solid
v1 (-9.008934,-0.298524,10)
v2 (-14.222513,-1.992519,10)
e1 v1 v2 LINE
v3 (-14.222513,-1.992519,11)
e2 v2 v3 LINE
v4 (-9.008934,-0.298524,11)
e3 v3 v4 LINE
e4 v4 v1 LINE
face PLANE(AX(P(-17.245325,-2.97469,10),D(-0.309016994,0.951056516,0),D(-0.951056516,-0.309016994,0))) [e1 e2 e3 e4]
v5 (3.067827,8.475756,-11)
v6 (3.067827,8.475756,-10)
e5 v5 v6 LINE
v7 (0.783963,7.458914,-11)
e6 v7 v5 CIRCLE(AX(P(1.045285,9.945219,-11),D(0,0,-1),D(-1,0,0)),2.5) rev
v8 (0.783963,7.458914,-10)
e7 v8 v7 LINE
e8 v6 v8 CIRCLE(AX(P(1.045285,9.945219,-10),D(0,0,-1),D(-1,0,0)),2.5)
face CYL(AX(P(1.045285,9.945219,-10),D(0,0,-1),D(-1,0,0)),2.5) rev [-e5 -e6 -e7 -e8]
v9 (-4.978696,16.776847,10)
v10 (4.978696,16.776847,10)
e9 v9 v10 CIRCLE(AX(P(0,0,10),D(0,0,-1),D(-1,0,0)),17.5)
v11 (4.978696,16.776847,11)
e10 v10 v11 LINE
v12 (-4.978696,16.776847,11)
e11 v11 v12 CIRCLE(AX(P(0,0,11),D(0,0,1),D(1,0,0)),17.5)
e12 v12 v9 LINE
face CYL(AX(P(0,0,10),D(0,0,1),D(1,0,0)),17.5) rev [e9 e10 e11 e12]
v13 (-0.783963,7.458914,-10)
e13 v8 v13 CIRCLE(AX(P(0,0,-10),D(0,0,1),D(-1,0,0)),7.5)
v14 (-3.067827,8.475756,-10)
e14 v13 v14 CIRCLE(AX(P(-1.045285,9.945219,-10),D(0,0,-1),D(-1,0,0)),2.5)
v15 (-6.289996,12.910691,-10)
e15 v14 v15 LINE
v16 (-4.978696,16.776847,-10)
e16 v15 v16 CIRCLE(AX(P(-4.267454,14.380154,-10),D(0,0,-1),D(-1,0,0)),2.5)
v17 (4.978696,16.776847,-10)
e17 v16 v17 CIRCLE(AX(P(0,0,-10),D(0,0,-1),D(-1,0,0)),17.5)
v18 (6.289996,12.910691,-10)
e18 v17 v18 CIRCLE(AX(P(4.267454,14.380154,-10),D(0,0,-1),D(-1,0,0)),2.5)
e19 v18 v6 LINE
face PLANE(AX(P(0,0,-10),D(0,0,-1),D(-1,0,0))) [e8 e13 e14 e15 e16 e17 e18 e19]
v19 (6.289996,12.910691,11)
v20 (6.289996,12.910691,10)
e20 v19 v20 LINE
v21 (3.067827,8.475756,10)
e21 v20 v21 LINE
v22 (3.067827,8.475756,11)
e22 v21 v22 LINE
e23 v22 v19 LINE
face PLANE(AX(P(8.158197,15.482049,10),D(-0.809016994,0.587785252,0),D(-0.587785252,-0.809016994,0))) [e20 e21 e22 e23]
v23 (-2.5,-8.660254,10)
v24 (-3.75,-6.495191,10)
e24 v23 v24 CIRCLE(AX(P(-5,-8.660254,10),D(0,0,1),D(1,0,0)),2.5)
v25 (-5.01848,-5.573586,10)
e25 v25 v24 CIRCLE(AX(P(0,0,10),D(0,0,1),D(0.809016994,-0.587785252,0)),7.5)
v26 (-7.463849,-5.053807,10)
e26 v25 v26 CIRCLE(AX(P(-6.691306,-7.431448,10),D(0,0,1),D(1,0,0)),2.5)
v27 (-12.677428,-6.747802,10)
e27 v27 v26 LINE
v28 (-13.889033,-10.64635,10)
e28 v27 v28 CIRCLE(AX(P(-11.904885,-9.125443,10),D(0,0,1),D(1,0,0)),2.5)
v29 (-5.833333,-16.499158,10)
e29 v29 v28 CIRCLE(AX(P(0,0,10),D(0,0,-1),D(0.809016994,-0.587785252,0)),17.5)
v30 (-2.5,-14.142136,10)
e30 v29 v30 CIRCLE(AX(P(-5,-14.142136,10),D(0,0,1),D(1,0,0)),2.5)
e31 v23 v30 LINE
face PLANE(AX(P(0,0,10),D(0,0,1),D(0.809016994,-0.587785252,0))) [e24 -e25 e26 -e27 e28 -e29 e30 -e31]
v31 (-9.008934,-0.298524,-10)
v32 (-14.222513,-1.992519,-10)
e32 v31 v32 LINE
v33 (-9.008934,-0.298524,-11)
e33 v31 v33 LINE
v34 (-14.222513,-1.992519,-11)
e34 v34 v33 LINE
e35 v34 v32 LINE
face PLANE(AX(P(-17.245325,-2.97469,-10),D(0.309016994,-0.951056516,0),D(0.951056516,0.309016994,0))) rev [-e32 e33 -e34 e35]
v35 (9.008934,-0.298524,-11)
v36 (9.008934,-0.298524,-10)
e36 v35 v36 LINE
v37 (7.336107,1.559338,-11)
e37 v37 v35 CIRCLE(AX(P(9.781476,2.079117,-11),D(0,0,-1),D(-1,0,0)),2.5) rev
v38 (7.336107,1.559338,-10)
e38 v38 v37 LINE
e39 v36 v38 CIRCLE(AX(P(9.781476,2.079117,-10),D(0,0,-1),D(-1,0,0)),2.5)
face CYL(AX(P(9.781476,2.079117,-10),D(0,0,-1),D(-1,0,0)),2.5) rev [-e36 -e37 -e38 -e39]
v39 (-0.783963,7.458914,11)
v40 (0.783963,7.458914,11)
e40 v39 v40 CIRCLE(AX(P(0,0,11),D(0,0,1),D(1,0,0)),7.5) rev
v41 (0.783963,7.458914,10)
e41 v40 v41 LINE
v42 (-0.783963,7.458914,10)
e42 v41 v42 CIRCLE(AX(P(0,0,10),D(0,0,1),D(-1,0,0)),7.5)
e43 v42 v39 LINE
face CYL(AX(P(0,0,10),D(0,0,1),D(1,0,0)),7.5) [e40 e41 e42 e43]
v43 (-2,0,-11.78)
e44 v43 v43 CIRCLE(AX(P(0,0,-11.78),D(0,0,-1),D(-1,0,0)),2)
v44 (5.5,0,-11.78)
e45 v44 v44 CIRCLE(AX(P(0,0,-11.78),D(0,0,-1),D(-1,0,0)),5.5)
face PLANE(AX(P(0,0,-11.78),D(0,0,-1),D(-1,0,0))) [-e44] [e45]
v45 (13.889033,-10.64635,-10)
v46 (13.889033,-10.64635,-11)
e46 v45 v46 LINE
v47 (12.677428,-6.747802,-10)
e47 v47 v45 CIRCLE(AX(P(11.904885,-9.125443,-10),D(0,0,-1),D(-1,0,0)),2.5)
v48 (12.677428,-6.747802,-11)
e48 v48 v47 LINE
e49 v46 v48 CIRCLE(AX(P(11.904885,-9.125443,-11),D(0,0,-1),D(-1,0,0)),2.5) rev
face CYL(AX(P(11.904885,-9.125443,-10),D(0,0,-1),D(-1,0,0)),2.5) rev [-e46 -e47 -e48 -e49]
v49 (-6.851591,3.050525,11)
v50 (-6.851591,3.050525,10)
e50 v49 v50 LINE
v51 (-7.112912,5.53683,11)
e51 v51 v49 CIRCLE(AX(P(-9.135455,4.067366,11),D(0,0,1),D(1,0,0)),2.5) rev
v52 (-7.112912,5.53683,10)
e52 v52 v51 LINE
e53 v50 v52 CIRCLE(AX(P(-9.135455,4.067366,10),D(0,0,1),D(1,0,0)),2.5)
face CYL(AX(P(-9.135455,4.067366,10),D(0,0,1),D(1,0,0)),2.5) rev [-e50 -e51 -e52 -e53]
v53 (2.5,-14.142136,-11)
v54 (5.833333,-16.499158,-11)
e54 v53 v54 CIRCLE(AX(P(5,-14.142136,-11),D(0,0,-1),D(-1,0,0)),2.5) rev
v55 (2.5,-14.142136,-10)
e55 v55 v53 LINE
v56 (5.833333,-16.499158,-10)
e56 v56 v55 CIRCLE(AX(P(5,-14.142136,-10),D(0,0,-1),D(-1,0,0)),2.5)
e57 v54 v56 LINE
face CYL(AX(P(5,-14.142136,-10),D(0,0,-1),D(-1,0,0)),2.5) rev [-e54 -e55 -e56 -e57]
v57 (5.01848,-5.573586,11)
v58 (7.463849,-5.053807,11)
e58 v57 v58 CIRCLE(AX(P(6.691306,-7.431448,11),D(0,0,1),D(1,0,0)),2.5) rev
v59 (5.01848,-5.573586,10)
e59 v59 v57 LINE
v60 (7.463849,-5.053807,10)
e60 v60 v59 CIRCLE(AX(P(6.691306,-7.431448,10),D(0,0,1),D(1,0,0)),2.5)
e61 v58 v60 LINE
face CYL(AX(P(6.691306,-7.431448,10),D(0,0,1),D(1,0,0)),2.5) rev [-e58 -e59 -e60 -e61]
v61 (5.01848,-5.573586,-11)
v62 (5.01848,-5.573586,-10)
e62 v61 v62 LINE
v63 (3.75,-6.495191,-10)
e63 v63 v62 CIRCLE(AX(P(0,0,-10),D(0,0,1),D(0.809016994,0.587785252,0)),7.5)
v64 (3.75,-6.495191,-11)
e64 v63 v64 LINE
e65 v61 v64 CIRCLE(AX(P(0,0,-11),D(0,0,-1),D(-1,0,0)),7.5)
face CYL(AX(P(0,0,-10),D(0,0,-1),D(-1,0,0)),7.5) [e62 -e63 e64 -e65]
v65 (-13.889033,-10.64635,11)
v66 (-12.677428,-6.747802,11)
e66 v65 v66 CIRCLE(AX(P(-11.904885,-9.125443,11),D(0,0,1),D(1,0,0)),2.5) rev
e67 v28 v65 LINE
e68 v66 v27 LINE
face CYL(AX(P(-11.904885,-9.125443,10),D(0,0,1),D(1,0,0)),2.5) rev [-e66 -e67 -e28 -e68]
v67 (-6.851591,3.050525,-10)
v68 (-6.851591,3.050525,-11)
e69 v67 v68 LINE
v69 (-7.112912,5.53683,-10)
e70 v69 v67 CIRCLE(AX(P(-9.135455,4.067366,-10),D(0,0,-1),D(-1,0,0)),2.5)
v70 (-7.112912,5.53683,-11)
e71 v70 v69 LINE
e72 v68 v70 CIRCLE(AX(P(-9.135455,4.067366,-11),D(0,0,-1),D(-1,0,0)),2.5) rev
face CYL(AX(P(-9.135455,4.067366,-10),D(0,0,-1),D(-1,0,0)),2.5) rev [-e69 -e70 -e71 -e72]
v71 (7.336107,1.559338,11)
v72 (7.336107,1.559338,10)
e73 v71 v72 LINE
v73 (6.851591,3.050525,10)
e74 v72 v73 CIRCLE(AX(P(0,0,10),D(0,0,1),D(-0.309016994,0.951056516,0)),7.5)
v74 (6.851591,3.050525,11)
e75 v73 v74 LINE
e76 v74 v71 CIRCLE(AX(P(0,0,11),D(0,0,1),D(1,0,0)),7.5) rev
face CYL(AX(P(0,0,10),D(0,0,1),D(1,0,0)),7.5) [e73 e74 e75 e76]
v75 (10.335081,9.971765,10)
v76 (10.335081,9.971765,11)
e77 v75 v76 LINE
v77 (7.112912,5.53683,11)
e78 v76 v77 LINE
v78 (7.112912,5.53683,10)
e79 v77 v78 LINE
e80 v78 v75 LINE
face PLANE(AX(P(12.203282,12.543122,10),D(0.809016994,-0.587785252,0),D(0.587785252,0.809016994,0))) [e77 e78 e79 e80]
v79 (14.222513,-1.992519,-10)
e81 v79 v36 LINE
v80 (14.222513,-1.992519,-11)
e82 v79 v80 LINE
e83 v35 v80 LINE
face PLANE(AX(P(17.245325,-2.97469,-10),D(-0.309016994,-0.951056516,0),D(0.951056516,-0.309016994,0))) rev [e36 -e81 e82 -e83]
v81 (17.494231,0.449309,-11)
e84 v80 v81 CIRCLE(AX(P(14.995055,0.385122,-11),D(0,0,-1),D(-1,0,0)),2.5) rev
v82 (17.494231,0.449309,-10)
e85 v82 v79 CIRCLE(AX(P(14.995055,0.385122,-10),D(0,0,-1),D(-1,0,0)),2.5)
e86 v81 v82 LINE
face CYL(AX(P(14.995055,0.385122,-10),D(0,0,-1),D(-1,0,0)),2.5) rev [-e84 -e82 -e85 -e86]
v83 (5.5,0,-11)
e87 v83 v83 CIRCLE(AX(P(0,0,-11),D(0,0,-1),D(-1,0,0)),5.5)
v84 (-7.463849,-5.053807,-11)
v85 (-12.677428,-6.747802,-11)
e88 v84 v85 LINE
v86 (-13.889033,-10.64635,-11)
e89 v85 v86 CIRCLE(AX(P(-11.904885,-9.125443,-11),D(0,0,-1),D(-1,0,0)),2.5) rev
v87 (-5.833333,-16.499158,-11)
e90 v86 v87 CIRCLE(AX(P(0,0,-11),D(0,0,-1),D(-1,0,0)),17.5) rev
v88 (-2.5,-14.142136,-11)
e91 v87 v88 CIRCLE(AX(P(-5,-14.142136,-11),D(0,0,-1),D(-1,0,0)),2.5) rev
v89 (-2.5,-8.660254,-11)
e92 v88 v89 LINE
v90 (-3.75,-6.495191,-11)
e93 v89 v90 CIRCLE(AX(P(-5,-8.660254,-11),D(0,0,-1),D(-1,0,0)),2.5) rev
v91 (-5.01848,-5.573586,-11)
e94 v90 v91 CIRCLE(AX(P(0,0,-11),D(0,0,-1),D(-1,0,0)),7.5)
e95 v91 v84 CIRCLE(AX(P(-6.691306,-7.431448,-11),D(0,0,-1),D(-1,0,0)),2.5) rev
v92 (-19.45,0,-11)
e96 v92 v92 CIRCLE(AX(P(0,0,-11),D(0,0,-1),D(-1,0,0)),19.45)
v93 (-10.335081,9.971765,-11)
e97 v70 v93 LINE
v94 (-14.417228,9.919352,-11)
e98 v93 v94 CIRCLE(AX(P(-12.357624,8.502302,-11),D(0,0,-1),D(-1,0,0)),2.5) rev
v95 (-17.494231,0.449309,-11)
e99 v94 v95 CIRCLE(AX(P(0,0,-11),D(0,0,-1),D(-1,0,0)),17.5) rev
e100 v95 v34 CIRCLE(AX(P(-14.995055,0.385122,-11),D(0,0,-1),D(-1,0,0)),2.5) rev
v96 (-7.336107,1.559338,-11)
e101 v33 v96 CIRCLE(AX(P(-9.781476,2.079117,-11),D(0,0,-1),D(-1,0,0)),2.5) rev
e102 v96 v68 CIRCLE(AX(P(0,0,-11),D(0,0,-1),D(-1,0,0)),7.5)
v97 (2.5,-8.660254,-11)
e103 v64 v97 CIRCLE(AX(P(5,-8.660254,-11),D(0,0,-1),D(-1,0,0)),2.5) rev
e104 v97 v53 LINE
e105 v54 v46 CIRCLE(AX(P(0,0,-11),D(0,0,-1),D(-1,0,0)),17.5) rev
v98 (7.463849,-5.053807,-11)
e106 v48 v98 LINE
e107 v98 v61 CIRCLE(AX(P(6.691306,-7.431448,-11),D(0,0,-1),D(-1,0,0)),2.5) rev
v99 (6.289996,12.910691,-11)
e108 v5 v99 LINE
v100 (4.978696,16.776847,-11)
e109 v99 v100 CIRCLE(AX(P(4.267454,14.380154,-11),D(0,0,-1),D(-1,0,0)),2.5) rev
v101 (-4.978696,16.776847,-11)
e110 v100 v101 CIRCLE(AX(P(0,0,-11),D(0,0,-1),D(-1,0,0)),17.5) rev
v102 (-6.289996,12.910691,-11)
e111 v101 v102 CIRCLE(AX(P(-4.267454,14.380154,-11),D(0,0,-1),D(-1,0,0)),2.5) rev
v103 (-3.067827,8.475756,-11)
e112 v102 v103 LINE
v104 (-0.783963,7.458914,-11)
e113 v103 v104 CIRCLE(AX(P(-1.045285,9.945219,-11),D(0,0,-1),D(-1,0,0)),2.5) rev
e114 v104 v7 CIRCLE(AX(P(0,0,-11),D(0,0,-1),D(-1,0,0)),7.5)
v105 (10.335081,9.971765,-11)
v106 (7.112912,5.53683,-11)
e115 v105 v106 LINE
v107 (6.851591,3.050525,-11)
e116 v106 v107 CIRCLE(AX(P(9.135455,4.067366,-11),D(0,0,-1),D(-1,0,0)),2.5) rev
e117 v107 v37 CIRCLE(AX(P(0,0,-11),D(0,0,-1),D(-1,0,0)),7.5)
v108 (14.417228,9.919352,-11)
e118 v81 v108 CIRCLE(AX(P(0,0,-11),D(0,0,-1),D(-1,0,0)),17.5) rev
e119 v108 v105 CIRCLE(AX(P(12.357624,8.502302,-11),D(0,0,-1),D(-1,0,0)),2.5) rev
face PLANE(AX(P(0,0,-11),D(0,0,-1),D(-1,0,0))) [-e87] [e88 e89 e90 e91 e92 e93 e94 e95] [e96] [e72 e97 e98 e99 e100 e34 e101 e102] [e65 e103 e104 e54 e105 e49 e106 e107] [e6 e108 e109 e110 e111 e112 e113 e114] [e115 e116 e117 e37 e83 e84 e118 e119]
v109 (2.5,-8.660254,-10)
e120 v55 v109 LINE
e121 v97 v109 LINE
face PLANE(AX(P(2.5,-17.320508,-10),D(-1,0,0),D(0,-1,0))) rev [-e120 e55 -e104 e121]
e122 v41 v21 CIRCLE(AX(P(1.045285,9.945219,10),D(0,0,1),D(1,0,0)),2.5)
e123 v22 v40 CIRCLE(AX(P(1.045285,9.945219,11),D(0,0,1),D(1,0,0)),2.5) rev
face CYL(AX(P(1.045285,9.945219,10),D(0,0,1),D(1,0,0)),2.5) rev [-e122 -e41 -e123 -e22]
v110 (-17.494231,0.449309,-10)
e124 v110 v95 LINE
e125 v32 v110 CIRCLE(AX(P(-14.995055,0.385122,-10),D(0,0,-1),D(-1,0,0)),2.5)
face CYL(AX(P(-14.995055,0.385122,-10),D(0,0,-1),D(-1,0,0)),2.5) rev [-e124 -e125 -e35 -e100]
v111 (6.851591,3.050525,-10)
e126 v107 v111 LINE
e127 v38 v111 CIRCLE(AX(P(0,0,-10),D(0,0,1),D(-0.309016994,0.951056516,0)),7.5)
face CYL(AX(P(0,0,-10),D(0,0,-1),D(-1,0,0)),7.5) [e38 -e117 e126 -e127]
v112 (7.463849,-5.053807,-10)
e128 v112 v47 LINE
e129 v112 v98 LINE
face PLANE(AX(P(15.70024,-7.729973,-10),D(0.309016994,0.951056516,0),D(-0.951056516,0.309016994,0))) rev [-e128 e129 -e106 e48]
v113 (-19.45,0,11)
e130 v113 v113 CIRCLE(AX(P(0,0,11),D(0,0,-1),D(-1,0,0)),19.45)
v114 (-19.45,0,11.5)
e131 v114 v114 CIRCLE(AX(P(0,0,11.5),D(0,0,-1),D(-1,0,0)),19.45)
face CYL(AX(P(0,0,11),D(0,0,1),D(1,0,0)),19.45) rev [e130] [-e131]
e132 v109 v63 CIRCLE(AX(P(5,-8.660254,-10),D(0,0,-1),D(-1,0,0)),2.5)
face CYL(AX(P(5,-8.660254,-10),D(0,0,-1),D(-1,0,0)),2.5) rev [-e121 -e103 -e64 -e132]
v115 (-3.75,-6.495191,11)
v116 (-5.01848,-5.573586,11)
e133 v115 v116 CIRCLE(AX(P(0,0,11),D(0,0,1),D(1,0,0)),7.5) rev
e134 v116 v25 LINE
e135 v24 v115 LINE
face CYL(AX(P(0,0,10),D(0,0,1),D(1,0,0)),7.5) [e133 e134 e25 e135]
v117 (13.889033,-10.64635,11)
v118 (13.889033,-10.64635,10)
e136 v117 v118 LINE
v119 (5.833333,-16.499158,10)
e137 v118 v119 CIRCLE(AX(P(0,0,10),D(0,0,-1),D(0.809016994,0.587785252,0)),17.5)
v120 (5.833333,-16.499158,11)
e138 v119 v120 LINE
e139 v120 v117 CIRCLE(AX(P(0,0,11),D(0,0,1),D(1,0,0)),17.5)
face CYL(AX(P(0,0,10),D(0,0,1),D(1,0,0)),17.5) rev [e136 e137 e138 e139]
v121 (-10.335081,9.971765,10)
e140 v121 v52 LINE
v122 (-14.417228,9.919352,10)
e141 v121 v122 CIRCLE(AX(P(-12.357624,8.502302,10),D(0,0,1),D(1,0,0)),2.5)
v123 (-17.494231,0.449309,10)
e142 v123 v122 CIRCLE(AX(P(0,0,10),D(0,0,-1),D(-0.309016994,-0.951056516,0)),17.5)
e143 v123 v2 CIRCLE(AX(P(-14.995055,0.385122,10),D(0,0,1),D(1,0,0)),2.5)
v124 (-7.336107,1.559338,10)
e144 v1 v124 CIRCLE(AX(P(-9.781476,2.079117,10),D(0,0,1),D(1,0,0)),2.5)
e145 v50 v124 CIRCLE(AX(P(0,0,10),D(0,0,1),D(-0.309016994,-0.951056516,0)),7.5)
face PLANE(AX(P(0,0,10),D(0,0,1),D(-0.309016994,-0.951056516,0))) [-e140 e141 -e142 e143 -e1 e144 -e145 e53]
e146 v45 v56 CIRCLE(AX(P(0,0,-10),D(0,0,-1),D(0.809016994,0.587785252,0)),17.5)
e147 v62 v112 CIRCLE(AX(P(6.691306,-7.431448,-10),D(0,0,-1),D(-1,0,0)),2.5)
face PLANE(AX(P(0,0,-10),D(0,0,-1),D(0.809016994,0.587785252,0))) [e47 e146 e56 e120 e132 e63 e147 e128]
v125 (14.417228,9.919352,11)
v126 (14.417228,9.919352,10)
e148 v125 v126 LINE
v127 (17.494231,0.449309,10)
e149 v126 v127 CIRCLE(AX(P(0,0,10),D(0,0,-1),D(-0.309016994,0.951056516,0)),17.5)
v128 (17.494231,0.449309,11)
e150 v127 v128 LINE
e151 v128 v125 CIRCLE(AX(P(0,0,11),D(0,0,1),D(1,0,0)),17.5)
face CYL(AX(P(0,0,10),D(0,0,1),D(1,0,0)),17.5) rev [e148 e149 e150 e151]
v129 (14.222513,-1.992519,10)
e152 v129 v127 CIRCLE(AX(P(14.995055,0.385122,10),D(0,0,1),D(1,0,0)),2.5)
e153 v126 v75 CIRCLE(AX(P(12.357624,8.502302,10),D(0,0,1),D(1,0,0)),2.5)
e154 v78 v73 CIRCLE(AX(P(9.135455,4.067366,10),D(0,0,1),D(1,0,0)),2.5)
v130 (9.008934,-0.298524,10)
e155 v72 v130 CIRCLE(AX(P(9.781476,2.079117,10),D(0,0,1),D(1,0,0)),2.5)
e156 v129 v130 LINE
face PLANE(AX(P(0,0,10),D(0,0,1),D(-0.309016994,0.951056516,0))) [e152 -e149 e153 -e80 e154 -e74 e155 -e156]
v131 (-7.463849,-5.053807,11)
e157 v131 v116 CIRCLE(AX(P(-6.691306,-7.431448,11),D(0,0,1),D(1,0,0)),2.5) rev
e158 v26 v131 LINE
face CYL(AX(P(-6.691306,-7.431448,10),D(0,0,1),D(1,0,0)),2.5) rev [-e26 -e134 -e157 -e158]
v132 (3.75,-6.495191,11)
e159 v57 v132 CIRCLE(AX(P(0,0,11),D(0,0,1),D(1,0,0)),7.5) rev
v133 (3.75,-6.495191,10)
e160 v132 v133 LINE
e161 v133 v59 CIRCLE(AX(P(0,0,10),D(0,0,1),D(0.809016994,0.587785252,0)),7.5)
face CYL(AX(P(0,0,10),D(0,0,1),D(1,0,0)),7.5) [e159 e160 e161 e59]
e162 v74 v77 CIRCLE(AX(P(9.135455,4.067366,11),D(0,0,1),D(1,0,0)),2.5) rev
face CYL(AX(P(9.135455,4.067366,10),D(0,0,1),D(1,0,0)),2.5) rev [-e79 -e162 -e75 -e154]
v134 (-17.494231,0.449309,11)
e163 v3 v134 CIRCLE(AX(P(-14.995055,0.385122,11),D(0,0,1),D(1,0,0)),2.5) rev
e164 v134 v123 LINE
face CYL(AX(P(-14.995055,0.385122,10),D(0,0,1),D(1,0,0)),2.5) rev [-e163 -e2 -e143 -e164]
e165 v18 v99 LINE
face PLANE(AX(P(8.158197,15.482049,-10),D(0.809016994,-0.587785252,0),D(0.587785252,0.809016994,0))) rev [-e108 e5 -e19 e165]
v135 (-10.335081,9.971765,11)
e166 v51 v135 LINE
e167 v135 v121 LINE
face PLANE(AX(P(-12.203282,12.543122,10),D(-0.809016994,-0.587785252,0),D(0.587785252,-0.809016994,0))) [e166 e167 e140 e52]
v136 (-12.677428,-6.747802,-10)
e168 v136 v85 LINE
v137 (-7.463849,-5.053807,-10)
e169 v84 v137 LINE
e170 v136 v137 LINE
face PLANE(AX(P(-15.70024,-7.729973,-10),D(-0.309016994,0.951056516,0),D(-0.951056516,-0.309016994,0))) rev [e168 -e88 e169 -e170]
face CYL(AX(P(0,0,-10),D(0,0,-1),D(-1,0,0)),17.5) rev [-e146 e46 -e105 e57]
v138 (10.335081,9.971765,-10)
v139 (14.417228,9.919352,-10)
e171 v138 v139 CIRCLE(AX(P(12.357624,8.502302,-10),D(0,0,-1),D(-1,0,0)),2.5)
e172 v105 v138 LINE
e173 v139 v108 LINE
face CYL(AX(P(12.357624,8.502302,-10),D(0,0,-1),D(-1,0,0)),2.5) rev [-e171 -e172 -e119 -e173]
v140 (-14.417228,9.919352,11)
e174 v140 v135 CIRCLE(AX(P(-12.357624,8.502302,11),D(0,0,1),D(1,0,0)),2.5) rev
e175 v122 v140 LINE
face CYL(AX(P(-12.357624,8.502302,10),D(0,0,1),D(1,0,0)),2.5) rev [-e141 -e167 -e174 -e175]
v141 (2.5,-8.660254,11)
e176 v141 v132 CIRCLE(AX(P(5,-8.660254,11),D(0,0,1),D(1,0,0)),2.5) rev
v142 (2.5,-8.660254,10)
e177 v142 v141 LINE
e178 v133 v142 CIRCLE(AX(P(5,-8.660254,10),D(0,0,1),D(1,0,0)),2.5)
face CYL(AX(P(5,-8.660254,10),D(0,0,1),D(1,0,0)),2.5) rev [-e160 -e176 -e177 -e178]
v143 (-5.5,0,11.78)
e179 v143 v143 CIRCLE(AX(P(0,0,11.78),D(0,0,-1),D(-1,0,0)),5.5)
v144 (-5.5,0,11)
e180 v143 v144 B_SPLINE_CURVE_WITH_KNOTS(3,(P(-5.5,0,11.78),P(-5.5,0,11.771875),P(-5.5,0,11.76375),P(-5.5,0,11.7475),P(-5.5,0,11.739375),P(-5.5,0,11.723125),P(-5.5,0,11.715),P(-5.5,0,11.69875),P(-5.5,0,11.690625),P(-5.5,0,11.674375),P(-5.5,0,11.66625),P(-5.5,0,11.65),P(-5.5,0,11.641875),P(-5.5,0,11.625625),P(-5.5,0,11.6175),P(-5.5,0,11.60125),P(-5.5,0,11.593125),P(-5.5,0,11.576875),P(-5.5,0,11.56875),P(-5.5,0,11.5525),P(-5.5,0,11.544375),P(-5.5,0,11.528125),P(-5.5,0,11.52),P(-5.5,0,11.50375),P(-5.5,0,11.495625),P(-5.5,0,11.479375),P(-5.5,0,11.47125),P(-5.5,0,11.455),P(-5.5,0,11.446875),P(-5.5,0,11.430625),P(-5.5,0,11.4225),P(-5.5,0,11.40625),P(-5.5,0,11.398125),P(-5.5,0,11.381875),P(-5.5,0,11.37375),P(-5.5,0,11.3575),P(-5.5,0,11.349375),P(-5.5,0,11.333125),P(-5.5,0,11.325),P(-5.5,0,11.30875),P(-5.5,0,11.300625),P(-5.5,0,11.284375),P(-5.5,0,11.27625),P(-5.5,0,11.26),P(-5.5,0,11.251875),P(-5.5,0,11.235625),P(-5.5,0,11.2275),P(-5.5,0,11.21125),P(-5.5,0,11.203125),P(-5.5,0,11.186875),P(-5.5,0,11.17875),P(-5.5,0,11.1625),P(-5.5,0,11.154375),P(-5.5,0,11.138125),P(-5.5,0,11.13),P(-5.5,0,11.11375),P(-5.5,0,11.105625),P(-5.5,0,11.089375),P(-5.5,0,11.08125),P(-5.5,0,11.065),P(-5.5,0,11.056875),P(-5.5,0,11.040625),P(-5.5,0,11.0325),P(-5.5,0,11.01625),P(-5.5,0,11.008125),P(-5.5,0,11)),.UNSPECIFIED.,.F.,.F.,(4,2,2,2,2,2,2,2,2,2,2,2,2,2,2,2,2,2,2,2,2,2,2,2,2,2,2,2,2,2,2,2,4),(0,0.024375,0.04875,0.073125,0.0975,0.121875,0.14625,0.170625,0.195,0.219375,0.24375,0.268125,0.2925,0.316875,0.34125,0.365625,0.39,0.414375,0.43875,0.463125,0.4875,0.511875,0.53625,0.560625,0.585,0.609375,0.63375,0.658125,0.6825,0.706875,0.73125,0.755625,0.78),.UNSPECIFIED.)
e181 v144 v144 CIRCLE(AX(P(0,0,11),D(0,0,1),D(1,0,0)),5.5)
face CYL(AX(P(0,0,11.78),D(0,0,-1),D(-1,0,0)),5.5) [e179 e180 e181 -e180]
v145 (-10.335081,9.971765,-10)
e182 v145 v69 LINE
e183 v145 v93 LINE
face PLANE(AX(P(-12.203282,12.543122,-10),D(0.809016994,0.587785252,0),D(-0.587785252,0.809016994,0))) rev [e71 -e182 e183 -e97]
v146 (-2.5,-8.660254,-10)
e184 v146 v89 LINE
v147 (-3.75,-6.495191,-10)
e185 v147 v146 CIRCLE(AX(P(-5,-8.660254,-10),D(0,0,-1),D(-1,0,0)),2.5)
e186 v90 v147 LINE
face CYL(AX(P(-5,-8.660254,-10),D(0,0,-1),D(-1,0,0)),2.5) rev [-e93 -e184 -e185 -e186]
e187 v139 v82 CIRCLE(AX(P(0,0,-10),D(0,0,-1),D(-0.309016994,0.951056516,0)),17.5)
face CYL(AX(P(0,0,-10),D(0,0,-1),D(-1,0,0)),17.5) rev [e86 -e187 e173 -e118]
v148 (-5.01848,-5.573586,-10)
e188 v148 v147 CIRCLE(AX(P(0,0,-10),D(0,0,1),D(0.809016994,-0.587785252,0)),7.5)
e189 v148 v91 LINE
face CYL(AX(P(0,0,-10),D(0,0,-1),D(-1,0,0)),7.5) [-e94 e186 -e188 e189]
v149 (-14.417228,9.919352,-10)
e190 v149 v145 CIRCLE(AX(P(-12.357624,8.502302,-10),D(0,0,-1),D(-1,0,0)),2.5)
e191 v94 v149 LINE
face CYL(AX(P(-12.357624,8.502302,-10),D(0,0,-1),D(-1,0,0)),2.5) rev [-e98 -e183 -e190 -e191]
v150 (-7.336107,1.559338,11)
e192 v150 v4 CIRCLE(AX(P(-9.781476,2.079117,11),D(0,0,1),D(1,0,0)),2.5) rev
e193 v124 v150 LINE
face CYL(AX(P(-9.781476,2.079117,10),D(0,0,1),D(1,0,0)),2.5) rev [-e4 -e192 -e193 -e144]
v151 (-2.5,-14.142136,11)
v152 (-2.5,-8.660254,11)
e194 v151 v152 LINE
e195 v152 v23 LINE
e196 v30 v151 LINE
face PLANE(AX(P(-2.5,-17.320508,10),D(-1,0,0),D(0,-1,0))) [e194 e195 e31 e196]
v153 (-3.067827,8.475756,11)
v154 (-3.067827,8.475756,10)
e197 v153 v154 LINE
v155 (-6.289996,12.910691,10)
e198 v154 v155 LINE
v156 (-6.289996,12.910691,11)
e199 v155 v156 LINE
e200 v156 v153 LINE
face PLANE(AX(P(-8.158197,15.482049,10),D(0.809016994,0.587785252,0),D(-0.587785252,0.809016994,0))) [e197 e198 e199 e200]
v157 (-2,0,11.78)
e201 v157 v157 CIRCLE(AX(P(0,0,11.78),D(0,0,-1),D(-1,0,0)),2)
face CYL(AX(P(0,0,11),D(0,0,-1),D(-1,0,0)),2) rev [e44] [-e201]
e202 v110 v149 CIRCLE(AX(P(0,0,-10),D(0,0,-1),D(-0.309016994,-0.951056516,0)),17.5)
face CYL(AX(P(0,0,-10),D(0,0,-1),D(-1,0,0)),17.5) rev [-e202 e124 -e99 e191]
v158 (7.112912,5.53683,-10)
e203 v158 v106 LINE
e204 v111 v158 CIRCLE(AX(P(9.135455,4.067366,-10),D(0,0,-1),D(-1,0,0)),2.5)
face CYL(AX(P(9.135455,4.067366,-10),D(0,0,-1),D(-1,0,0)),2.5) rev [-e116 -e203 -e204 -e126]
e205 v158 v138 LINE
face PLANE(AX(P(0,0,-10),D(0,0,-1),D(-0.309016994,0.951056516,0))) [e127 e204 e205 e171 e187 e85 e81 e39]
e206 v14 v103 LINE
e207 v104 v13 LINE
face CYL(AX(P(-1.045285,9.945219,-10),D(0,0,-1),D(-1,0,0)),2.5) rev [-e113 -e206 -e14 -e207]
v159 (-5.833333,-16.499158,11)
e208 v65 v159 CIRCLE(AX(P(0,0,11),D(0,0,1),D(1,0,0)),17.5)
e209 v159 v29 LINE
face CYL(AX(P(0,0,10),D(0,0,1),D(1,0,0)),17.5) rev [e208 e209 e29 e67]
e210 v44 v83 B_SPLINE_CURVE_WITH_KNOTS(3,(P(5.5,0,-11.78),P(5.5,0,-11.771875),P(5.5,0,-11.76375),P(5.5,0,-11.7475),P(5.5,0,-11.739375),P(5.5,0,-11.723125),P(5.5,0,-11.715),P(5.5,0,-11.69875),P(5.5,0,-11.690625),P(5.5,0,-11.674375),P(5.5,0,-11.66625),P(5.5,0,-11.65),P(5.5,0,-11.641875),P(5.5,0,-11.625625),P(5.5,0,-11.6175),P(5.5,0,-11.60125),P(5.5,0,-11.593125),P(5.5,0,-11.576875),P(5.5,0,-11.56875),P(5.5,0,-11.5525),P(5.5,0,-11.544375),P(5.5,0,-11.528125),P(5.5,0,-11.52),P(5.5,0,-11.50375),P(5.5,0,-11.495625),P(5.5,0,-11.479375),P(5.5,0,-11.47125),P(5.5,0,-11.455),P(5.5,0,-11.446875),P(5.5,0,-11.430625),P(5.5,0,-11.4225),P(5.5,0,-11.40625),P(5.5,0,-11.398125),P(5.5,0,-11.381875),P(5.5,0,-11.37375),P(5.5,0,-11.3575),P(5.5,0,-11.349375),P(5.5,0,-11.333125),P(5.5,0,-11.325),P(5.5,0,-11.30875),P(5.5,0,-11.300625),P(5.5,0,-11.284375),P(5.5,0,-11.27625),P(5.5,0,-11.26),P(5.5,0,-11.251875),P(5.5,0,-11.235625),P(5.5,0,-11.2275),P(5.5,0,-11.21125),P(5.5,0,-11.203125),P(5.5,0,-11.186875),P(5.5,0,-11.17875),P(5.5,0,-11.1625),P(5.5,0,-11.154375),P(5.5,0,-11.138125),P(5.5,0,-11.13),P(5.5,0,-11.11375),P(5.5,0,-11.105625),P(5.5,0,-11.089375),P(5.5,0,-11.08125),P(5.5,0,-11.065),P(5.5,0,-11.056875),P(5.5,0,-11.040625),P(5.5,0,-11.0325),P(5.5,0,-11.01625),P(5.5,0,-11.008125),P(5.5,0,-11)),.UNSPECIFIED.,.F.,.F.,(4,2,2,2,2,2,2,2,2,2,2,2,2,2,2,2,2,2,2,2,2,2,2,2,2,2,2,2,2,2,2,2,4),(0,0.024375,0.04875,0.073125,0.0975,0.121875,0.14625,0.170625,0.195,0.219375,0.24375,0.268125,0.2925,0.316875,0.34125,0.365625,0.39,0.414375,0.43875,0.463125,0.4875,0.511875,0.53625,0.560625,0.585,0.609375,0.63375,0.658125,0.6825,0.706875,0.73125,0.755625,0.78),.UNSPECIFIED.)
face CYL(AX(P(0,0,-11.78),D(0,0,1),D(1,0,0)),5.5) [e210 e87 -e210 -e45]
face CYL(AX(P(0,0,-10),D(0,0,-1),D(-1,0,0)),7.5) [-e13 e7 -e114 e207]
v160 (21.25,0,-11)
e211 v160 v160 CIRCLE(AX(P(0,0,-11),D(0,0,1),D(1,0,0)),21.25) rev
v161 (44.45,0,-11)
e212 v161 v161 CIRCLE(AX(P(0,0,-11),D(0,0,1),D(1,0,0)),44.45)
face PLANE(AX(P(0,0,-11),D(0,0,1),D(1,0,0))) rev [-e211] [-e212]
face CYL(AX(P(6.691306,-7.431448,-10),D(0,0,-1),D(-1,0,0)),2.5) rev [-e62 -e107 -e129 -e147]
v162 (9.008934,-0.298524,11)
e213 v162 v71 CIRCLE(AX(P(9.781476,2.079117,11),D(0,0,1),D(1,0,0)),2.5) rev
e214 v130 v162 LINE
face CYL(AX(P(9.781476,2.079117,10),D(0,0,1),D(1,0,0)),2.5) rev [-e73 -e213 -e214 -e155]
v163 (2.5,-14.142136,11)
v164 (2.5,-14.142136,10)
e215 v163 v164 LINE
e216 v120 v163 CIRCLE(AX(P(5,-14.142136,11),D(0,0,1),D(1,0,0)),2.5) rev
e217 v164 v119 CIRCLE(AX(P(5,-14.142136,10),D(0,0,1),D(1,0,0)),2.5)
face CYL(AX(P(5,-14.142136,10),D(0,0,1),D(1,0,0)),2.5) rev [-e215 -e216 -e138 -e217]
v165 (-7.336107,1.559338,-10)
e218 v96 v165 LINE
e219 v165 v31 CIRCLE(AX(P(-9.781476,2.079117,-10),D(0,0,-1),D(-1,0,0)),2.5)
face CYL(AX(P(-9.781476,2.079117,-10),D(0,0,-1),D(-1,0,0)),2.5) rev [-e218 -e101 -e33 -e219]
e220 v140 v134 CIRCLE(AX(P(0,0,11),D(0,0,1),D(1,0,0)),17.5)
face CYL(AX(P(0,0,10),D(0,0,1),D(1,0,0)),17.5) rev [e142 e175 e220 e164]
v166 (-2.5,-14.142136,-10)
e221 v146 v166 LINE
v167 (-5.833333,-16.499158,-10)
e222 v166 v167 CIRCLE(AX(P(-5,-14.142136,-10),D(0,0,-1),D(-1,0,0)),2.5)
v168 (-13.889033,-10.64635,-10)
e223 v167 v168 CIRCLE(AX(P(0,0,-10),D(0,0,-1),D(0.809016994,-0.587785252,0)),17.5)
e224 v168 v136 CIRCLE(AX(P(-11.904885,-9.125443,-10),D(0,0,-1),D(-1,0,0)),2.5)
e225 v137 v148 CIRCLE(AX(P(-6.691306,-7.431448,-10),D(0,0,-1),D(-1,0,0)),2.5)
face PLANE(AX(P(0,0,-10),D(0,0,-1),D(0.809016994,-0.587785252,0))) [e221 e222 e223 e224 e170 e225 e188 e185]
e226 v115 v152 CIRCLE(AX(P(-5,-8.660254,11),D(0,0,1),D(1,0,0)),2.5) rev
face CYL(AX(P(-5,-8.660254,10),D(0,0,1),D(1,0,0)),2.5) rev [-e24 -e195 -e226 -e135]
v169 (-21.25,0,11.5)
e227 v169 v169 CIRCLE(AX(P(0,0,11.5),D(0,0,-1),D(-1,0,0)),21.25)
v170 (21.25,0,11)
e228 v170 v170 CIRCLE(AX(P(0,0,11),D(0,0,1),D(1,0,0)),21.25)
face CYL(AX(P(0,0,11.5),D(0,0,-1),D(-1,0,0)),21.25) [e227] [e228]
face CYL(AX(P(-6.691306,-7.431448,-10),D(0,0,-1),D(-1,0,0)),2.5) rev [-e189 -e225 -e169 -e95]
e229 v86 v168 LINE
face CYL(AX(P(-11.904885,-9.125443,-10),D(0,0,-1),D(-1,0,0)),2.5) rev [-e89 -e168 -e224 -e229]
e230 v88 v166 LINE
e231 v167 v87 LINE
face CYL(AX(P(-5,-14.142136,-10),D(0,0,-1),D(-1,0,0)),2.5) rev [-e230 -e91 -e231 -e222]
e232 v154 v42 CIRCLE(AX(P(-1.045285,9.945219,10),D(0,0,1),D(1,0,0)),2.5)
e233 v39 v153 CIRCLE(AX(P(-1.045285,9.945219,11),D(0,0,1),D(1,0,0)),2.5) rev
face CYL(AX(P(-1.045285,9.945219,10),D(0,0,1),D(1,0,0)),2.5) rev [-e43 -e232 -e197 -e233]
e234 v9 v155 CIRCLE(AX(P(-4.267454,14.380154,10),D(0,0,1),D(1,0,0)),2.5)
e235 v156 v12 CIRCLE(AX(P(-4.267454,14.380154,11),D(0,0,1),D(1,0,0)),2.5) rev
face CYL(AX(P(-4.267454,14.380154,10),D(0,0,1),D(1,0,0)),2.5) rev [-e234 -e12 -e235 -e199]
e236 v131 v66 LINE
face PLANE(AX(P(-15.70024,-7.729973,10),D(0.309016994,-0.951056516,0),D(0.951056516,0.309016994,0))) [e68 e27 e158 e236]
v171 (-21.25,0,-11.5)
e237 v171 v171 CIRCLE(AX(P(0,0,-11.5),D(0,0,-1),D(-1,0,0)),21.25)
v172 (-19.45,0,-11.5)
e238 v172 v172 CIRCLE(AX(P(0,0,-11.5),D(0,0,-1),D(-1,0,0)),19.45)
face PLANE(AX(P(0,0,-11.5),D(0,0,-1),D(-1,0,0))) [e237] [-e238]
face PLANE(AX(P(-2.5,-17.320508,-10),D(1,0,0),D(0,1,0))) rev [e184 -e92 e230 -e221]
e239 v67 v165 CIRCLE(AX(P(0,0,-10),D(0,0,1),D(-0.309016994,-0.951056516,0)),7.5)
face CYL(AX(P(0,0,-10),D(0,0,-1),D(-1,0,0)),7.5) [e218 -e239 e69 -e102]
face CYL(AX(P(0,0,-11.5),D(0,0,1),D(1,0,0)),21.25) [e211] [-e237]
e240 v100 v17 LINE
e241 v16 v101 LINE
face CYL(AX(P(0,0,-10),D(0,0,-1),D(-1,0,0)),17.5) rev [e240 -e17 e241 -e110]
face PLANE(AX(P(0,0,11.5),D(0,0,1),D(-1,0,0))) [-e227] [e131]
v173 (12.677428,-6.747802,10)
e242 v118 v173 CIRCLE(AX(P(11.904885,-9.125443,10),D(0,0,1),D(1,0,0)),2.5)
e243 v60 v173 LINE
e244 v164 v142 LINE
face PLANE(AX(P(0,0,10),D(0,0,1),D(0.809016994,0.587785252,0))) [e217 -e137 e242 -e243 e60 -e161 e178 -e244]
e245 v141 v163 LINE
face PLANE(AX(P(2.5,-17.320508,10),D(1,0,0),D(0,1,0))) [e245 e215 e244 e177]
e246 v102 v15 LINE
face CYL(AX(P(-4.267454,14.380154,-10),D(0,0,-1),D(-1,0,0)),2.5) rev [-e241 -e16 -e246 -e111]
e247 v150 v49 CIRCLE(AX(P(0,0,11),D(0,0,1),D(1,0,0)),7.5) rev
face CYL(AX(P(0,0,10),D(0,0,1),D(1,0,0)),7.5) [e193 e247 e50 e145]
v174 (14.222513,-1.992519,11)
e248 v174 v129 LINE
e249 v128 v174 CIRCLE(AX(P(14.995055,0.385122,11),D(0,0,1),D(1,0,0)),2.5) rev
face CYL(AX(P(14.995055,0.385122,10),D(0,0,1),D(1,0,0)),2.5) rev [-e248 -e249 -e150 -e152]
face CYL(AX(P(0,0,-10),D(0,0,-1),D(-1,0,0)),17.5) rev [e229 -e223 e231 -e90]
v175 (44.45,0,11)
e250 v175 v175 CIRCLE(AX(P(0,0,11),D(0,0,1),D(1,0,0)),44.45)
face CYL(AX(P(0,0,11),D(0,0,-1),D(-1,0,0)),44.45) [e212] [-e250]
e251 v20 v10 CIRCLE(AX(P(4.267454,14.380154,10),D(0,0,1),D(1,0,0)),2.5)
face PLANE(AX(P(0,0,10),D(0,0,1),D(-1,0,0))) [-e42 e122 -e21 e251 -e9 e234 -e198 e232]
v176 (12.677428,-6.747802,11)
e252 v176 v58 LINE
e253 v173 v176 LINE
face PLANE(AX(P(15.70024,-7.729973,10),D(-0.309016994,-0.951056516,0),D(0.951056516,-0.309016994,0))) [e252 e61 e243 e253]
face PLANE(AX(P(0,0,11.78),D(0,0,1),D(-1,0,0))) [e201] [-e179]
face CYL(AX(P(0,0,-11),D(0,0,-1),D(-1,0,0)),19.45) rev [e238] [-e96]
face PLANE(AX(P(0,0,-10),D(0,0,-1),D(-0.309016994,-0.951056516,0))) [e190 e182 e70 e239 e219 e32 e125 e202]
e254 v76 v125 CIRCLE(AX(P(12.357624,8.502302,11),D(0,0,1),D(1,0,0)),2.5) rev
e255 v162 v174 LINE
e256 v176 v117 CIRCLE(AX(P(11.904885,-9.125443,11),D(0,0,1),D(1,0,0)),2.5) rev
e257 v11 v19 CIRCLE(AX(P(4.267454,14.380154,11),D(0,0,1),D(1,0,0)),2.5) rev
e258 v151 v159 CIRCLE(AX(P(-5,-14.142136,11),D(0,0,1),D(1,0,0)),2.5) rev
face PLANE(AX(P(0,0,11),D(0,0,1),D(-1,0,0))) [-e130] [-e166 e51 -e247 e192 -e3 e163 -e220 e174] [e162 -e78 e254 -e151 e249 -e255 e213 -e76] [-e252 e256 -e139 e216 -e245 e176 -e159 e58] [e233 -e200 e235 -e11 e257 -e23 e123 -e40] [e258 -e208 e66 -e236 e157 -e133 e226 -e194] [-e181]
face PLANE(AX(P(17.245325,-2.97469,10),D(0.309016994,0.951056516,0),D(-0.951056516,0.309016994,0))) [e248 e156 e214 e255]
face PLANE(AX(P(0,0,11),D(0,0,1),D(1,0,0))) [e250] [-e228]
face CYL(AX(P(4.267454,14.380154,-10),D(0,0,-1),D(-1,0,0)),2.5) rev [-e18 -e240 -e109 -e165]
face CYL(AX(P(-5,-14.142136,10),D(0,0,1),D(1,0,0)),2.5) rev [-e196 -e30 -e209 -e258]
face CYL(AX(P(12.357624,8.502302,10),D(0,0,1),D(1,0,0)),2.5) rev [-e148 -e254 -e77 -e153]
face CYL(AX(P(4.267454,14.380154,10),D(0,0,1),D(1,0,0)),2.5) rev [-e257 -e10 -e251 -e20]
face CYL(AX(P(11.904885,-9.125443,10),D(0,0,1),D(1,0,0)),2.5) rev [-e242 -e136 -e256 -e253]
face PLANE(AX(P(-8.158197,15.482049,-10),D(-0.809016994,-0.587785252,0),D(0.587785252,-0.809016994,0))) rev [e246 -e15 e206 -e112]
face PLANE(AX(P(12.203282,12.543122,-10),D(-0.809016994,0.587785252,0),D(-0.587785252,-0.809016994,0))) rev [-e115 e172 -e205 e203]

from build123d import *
from build123d.topology import SkipClean

# Parameters (mm, degrees)
SKETCH1_R                = 44.45
SKETCH1_R_2              = 2
BOSS_EXTRUDE1_DEPTH      = 11
BOSS_EXTRUDE3_START      = 0.5
SKETCH3_R                = 21.25
SKETCH3_R_2              = 2
BOSS_EXTRUDE3_DEPTH      = 0.5
CUT_EXTRUDE1_DEPTH       = 1.5
FILLET1_R                = 2.5
CIRPATTERN1_COUNT        = 5
FILLET1_OF_CIRPATTERN1_R = 2.5
SKETCH5_R                = 19.45
CUT_EXTRUDE2_DEPTH       = 0.5
BOSS_EXTRUDE4_START      = 0.78
SKETCH6_R                = 5.5
SKETCH6_R_2              = 2
BOSS_EXTRUDE4_DEPTH      = 0.78
MIRROR1_START            = 10
MIRROR1_DEPTH            = 1
MIRROR1_START_2          = 11
MIRROR1_2_OUTLINE_R      = 21.25
MIRROR1_2_OUTLINE_R_2    = 19.45
MIRROR1_2_OUTLINE_R_3    = 5.5
MIRROR1_2_OUTLINE_R_4    = 2
MIRROR1_2_DEPTH          = 0.5
MIRROR1_START_3          = 11.5
MIRROR1_3_OUTLINE_R      = 5.5
MIRROR1_3_OUTLINE_R_2    = 2
MIRROR1_3_DEPTH          = 0.28


# Read off the part's stored shape, not the designer's step: Mirror1
with BuildPart() as part:
    # Sketch1 → Boss-Extrude1 (new, symmetric)
    with BuildSketch(Plane.XY):
        Circle(SKETCH1_R)
        Circle(SKETCH1_R_2, mode=Mode.SUBTRACT)
    extrude(amount=BOSS_EXTRUDE1_DEPTH, both=True)

    # Sketch3 → Boss-Extrude3 (add)
    with SkipClean():  # the faces are left unmerged after this step: merging them gives an invalid solid
        with BuildSketch(Plane(origin=(0, 0, -11), x_dir=(-1, 0, 0), z_dir=(0, 0, -1)).offset(BOSS_EXTRUDE3_START)):
            with Locations(Location((0, 0, 0), (0, 0, 180))):
                Circle(SKETCH3_R)
            Circle(SKETCH3_R_2, mode=Mode.SUBTRACT)
        extrude(amount=-BOSS_EXTRUDE3_DEPTH)

    # Sketch4 → Cut-Extrude1 (cut)
    with SkipClean():  # the faces are left unmerged after this step: merging them gives an invalid solid
        with BuildSketch(Plane(origin=(0, 0, -11.5), x_dir=(-1, 0, 0), z_dir=(0, 0, -1))):
            with BuildLine():
                Line((8.158196723, 15.482048515), (2.133726892, 7.190077159))
                ThreePointArc((2.133726892, 7.190077159), (0, 7.5), (-2.133726892, 7.190077159))
                Line((-2.133726892, 7.190077159), (-8.158196723, 15.482048515))
                ThreePointArc((-8.158196723, 15.482048515), (0, 17.5), (8.158196723, 15.482048515))
            make_face()
        cut_extrude1 = extrude(amount=-CUT_EXTRUDE1_DEPTH, mode=Mode.SUBTRACT)

    # Fillet1
    fillet1_edges = [part.edges().sort_by_distance(p)[0] for p in [
        (8.158196723, 15.482048515, -10.75),
        (-8.158196723, 15.482048515, -10.75),
        (-2.133726892, 7.190077159, -10.75),
        (2.133726892, 7.190077159, -10.75),
    ]]
    fillet(fillet1_edges, radius=FILLET1_R)

    # CirPattern1: Cut-Extrude1 ×5 about axis
    cirpattern1_axis = Axis((0, 0, 0), (0, 0, 1))
    for i in range(1, CIRPATTERN1_COUNT):
        add(cut_extrude1.rotate(cirpattern1_axis, i * 360 / CIRPATTERN1_COUNT), mode=Mode.SUBTRACT)

    # Fillet1 of CirPattern1
    fillet1_of_cirpattern1_edges = [part.edges().sort_by_distance(p)[0] for p in [
        (-12.203281695, 12.543122254, -10.75),
        (-17.245324557, -2.974690056, -10.75),
        (-7.497527606, 0.192561168, -10.75),
        (-6.178811864, 4.251150897, -10.75),
        (-15.700239585, -7.729972637, -10.75),
        (-2.5, -17.320508076, -10.75),
        (-2.5, -7.071067812, -10.75),
        (-5.952442634, -4.562721413, -10.75),
        (2.5, -17.320508076, -10.75),
        (15.700239585, -7.729972637, -10.75),
        (5.952442634, -4.562721413, -10.75),
        (2.5, -7.071067812, -10.75),
        (17.245324557, -2.974690056, -10.75),
        (12.203281695, 12.543122254, -10.75),
        (6.178811864, 4.251150897, -10.75),
        (7.497527606, 0.192561168, -10.75),
    ]]
    fillet(fillet1_of_cirpattern1_edges, radius=FILLET1_OF_CIRPATTERN1_R)

    # Sketch5 → Cut-Extrude2 (cut)
    with BuildSketch(Plane(origin=(0, 0, -11.5), x_dir=(-1, 0, 0), z_dir=(0, 0, -1))):
        Circle(SKETCH5_R)
    extrude(amount=-CUT_EXTRUDE2_DEPTH, mode=Mode.SUBTRACT)

    # Sketch6 → Boss-Extrude4 (add)
    with BuildSketch(Plane(origin=(0, 0, -11), x_dir=(-1, 0, 0), z_dir=(0, 0, -1)).offset(BOSS_EXTRUDE4_START)):
        with Locations(Location((0, 0, 0), (0, 0, 180))):
            Circle(SKETCH6_R)
        Circle(SKETCH6_R_2, mode=Mode.SUBTRACT)
    extrude(amount=-BOSS_EXTRUDE4_DEPTH)

    # Mirror1 outline → Mirror1 (cut)
    with BuildSketch(Plane.XY.offset(MIRROR1_START)):
        with BuildLine():
            Line((-7.46384855, -5.053806964), (-12.677427753, -6.747801535))
            ThreePointArc((-12.677427753, -6.747801535), (-14.292248864, -8.383489285), (-13.889032812, -10.646349964))
            ThreePointArc((-13.889032812, -10.646349964), (-10.286241915, -14.157797402), (-5.833333333, -16.499158228))
            ThreePointArc((-5.833333333, -16.499158228), (-3.556624327, -16.183377076), (-2.5, -14.142135624))
            Line((-2.5, -14.142135624), (-2.5, -8.660254038))
            ThreePointArc((-2.5, -8.660254038), (-2.834936491, -7.410254038), (-3.75, -6.495190528))
            ThreePointArc((-3.75, -6.495190528), (-4.408389392, -6.067627458), (-5.018479548, -5.573586191))
            ThreePointArc((-5.018479548, -5.573586191), (-6.171526837, -4.986079253), (-7.46384855, -5.053806964))
        make_face()
        with BuildLine():
            ThreePointArc((5.018479548, -5.573586191), (4.408389392, -6.067627458), (3.75, -6.495190528))
            ThreePointArc((3.75, -6.495190528), (2.834936491, -7.410254038), (2.5, -8.660254038))
            Line((2.5, -8.660254038), (2.5, -14.142135624))
            ThreePointArc((2.5, -14.142135624), (3.556624327, -16.183377076), (5.833333333, -16.499158228))
            ThreePointArc((5.833333333, -16.499158228), (10.286241915, -14.157797402), (13.889032812, -10.646349964))
            ThreePointArc((13.889032812, -10.646349964), (14.292248864, -8.383489285), (12.677427753, -6.747801535))
            Line((12.677427753, -6.747801535), (7.46384855, -5.053806964))
            ThreePointArc((7.46384855, -5.053806964), (6.171526837, -4.986079253), (5.018479548, -5.573586191))
        make_face()
        with BuildLine():
            ThreePointArc((6.851590932, 3.050524823), (7.132923872, 2.317627458), (7.336107006, 1.559337681))
            ThreePointArc((7.336107006, 1.559337681), (7.923613944, 0.406290392), (9.008933521, -0.298524383))
            Line((9.008933521, -0.298524383), (14.222512725, -1.992518954))
            ThreePointArc((14.222512725, -1.992518954), (16.490363583, -1.618387801), (17.49423108, 0.449309393))
            ThreePointArc((17.49423108, 0.449309393), (16.643489035, 5.407797401), (14.417227682, 9.919352094))
            ThreePointArc((14.417227682, 9.919352094), (12.389719901, 11.002095754), (10.335081241, 9.971764926))
            Line((10.335081241, 9.971764926), (7.11291209, 5.536829561))
            ThreePointArc((7.11291209, 5.536829561), (6.649149838, 4.328687589), (6.851590932, 3.050524823))
        make_face()
        with BuildLine():
            ThreePointArc((-0.783963475, 7.458914215), (0, 7.5), (0.783963475, 7.458914215))
            ThreePointArc((0.783963475, 7.458914215), (2.062126241, 7.66135531), (3.067827119, 8.475755823))
            Line((3.067827119, 8.475755823), (6.28999627, 12.910691187))
            ThreePointArc((6.28999627, 12.910691187), (6.634980854, 15.183158408), (4.978696081, 16.776846704))
            ThreePointArc((4.978696081, 16.776846704), (0, 17.5), (-4.978696081, 16.776846704))
            ThreePointArc((-4.978696081, 16.776846704), (-6.634980854, 15.183158408), (-6.28999627, 12.910691187))
            Line((-6.28999627, 12.910691187), (-3.067827119, 8.475755823))
            ThreePointArc((-3.067827119, 8.475755823), (-2.062126241, 7.66135531), (-0.783963475, 7.458914215))
        make_face()
        with BuildLine():
            ThreePointArc((-7.336107006, 1.559337681), (-7.132923872, 2.317627458), (-6.851590932, 3.050524823))
            ThreePointArc((-6.851590932, 3.050524823), (-6.649149838, 4.328687589), (-7.11291209, 5.536829561))
            Line((-7.11291209, 5.536829561), (-10.335081241, 9.971764926))
            ThreePointArc((-10.335081241, 9.971764926), (-12.389719901, 11.002095754), (-14.417227682, 9.919352094))
            ThreePointArc((-14.417227682, 9.919352094), (-16.643489035, 5.407797401), (-17.49423108, 0.449309393))
            ThreePointArc((-17.49423108, 0.449309393), (-16.490363583, -1.618387801), (-14.222512725, -1.992518954))
            Line((-14.222512725, -1.992518954), (-9.008933521, -0.298524383))
            ThreePointArc((-9.008933521, -0.298524383), (-7.923613944, 0.406290392), (-7.336107006, 1.559337681))
        make_face()
    extrude(amount=MIRROR1_DEPTH, mode=Mode.SUBTRACT)

    # Mirror1 2 outline → Mirror1 2 (add)
    # profile 1 of 2: a face of its own
    with BuildSketch(Plane.XY.offset(MIRROR1_START_2)):
        Circle(MIRROR1_2_OUTLINE_R)
        Circle(MIRROR1_2_OUTLINE_R_2, mode=Mode.SUBTRACT)
    # profile 2 of 2: a face of its own
    with BuildSketch(Plane.XY.offset(MIRROR1_START_2)):
        Circle(MIRROR1_2_OUTLINE_R_3)
        Circle(MIRROR1_2_OUTLINE_R_4, mode=Mode.SUBTRACT)
    extrude(amount=MIRROR1_2_DEPTH)

    # Mirror1 3 outline → Mirror1 3 (add)
    with BuildSketch(Plane.XY.offset(MIRROR1_START_3)):
        Circle(MIRROR1_3_OUTLINE_R)
        Circle(MIRROR1_3_OUTLINE_R_2, mode=Mode.SUBTRACT)
    extrude(amount=MIRROR1_3_DEPTH)


solid = part.part
